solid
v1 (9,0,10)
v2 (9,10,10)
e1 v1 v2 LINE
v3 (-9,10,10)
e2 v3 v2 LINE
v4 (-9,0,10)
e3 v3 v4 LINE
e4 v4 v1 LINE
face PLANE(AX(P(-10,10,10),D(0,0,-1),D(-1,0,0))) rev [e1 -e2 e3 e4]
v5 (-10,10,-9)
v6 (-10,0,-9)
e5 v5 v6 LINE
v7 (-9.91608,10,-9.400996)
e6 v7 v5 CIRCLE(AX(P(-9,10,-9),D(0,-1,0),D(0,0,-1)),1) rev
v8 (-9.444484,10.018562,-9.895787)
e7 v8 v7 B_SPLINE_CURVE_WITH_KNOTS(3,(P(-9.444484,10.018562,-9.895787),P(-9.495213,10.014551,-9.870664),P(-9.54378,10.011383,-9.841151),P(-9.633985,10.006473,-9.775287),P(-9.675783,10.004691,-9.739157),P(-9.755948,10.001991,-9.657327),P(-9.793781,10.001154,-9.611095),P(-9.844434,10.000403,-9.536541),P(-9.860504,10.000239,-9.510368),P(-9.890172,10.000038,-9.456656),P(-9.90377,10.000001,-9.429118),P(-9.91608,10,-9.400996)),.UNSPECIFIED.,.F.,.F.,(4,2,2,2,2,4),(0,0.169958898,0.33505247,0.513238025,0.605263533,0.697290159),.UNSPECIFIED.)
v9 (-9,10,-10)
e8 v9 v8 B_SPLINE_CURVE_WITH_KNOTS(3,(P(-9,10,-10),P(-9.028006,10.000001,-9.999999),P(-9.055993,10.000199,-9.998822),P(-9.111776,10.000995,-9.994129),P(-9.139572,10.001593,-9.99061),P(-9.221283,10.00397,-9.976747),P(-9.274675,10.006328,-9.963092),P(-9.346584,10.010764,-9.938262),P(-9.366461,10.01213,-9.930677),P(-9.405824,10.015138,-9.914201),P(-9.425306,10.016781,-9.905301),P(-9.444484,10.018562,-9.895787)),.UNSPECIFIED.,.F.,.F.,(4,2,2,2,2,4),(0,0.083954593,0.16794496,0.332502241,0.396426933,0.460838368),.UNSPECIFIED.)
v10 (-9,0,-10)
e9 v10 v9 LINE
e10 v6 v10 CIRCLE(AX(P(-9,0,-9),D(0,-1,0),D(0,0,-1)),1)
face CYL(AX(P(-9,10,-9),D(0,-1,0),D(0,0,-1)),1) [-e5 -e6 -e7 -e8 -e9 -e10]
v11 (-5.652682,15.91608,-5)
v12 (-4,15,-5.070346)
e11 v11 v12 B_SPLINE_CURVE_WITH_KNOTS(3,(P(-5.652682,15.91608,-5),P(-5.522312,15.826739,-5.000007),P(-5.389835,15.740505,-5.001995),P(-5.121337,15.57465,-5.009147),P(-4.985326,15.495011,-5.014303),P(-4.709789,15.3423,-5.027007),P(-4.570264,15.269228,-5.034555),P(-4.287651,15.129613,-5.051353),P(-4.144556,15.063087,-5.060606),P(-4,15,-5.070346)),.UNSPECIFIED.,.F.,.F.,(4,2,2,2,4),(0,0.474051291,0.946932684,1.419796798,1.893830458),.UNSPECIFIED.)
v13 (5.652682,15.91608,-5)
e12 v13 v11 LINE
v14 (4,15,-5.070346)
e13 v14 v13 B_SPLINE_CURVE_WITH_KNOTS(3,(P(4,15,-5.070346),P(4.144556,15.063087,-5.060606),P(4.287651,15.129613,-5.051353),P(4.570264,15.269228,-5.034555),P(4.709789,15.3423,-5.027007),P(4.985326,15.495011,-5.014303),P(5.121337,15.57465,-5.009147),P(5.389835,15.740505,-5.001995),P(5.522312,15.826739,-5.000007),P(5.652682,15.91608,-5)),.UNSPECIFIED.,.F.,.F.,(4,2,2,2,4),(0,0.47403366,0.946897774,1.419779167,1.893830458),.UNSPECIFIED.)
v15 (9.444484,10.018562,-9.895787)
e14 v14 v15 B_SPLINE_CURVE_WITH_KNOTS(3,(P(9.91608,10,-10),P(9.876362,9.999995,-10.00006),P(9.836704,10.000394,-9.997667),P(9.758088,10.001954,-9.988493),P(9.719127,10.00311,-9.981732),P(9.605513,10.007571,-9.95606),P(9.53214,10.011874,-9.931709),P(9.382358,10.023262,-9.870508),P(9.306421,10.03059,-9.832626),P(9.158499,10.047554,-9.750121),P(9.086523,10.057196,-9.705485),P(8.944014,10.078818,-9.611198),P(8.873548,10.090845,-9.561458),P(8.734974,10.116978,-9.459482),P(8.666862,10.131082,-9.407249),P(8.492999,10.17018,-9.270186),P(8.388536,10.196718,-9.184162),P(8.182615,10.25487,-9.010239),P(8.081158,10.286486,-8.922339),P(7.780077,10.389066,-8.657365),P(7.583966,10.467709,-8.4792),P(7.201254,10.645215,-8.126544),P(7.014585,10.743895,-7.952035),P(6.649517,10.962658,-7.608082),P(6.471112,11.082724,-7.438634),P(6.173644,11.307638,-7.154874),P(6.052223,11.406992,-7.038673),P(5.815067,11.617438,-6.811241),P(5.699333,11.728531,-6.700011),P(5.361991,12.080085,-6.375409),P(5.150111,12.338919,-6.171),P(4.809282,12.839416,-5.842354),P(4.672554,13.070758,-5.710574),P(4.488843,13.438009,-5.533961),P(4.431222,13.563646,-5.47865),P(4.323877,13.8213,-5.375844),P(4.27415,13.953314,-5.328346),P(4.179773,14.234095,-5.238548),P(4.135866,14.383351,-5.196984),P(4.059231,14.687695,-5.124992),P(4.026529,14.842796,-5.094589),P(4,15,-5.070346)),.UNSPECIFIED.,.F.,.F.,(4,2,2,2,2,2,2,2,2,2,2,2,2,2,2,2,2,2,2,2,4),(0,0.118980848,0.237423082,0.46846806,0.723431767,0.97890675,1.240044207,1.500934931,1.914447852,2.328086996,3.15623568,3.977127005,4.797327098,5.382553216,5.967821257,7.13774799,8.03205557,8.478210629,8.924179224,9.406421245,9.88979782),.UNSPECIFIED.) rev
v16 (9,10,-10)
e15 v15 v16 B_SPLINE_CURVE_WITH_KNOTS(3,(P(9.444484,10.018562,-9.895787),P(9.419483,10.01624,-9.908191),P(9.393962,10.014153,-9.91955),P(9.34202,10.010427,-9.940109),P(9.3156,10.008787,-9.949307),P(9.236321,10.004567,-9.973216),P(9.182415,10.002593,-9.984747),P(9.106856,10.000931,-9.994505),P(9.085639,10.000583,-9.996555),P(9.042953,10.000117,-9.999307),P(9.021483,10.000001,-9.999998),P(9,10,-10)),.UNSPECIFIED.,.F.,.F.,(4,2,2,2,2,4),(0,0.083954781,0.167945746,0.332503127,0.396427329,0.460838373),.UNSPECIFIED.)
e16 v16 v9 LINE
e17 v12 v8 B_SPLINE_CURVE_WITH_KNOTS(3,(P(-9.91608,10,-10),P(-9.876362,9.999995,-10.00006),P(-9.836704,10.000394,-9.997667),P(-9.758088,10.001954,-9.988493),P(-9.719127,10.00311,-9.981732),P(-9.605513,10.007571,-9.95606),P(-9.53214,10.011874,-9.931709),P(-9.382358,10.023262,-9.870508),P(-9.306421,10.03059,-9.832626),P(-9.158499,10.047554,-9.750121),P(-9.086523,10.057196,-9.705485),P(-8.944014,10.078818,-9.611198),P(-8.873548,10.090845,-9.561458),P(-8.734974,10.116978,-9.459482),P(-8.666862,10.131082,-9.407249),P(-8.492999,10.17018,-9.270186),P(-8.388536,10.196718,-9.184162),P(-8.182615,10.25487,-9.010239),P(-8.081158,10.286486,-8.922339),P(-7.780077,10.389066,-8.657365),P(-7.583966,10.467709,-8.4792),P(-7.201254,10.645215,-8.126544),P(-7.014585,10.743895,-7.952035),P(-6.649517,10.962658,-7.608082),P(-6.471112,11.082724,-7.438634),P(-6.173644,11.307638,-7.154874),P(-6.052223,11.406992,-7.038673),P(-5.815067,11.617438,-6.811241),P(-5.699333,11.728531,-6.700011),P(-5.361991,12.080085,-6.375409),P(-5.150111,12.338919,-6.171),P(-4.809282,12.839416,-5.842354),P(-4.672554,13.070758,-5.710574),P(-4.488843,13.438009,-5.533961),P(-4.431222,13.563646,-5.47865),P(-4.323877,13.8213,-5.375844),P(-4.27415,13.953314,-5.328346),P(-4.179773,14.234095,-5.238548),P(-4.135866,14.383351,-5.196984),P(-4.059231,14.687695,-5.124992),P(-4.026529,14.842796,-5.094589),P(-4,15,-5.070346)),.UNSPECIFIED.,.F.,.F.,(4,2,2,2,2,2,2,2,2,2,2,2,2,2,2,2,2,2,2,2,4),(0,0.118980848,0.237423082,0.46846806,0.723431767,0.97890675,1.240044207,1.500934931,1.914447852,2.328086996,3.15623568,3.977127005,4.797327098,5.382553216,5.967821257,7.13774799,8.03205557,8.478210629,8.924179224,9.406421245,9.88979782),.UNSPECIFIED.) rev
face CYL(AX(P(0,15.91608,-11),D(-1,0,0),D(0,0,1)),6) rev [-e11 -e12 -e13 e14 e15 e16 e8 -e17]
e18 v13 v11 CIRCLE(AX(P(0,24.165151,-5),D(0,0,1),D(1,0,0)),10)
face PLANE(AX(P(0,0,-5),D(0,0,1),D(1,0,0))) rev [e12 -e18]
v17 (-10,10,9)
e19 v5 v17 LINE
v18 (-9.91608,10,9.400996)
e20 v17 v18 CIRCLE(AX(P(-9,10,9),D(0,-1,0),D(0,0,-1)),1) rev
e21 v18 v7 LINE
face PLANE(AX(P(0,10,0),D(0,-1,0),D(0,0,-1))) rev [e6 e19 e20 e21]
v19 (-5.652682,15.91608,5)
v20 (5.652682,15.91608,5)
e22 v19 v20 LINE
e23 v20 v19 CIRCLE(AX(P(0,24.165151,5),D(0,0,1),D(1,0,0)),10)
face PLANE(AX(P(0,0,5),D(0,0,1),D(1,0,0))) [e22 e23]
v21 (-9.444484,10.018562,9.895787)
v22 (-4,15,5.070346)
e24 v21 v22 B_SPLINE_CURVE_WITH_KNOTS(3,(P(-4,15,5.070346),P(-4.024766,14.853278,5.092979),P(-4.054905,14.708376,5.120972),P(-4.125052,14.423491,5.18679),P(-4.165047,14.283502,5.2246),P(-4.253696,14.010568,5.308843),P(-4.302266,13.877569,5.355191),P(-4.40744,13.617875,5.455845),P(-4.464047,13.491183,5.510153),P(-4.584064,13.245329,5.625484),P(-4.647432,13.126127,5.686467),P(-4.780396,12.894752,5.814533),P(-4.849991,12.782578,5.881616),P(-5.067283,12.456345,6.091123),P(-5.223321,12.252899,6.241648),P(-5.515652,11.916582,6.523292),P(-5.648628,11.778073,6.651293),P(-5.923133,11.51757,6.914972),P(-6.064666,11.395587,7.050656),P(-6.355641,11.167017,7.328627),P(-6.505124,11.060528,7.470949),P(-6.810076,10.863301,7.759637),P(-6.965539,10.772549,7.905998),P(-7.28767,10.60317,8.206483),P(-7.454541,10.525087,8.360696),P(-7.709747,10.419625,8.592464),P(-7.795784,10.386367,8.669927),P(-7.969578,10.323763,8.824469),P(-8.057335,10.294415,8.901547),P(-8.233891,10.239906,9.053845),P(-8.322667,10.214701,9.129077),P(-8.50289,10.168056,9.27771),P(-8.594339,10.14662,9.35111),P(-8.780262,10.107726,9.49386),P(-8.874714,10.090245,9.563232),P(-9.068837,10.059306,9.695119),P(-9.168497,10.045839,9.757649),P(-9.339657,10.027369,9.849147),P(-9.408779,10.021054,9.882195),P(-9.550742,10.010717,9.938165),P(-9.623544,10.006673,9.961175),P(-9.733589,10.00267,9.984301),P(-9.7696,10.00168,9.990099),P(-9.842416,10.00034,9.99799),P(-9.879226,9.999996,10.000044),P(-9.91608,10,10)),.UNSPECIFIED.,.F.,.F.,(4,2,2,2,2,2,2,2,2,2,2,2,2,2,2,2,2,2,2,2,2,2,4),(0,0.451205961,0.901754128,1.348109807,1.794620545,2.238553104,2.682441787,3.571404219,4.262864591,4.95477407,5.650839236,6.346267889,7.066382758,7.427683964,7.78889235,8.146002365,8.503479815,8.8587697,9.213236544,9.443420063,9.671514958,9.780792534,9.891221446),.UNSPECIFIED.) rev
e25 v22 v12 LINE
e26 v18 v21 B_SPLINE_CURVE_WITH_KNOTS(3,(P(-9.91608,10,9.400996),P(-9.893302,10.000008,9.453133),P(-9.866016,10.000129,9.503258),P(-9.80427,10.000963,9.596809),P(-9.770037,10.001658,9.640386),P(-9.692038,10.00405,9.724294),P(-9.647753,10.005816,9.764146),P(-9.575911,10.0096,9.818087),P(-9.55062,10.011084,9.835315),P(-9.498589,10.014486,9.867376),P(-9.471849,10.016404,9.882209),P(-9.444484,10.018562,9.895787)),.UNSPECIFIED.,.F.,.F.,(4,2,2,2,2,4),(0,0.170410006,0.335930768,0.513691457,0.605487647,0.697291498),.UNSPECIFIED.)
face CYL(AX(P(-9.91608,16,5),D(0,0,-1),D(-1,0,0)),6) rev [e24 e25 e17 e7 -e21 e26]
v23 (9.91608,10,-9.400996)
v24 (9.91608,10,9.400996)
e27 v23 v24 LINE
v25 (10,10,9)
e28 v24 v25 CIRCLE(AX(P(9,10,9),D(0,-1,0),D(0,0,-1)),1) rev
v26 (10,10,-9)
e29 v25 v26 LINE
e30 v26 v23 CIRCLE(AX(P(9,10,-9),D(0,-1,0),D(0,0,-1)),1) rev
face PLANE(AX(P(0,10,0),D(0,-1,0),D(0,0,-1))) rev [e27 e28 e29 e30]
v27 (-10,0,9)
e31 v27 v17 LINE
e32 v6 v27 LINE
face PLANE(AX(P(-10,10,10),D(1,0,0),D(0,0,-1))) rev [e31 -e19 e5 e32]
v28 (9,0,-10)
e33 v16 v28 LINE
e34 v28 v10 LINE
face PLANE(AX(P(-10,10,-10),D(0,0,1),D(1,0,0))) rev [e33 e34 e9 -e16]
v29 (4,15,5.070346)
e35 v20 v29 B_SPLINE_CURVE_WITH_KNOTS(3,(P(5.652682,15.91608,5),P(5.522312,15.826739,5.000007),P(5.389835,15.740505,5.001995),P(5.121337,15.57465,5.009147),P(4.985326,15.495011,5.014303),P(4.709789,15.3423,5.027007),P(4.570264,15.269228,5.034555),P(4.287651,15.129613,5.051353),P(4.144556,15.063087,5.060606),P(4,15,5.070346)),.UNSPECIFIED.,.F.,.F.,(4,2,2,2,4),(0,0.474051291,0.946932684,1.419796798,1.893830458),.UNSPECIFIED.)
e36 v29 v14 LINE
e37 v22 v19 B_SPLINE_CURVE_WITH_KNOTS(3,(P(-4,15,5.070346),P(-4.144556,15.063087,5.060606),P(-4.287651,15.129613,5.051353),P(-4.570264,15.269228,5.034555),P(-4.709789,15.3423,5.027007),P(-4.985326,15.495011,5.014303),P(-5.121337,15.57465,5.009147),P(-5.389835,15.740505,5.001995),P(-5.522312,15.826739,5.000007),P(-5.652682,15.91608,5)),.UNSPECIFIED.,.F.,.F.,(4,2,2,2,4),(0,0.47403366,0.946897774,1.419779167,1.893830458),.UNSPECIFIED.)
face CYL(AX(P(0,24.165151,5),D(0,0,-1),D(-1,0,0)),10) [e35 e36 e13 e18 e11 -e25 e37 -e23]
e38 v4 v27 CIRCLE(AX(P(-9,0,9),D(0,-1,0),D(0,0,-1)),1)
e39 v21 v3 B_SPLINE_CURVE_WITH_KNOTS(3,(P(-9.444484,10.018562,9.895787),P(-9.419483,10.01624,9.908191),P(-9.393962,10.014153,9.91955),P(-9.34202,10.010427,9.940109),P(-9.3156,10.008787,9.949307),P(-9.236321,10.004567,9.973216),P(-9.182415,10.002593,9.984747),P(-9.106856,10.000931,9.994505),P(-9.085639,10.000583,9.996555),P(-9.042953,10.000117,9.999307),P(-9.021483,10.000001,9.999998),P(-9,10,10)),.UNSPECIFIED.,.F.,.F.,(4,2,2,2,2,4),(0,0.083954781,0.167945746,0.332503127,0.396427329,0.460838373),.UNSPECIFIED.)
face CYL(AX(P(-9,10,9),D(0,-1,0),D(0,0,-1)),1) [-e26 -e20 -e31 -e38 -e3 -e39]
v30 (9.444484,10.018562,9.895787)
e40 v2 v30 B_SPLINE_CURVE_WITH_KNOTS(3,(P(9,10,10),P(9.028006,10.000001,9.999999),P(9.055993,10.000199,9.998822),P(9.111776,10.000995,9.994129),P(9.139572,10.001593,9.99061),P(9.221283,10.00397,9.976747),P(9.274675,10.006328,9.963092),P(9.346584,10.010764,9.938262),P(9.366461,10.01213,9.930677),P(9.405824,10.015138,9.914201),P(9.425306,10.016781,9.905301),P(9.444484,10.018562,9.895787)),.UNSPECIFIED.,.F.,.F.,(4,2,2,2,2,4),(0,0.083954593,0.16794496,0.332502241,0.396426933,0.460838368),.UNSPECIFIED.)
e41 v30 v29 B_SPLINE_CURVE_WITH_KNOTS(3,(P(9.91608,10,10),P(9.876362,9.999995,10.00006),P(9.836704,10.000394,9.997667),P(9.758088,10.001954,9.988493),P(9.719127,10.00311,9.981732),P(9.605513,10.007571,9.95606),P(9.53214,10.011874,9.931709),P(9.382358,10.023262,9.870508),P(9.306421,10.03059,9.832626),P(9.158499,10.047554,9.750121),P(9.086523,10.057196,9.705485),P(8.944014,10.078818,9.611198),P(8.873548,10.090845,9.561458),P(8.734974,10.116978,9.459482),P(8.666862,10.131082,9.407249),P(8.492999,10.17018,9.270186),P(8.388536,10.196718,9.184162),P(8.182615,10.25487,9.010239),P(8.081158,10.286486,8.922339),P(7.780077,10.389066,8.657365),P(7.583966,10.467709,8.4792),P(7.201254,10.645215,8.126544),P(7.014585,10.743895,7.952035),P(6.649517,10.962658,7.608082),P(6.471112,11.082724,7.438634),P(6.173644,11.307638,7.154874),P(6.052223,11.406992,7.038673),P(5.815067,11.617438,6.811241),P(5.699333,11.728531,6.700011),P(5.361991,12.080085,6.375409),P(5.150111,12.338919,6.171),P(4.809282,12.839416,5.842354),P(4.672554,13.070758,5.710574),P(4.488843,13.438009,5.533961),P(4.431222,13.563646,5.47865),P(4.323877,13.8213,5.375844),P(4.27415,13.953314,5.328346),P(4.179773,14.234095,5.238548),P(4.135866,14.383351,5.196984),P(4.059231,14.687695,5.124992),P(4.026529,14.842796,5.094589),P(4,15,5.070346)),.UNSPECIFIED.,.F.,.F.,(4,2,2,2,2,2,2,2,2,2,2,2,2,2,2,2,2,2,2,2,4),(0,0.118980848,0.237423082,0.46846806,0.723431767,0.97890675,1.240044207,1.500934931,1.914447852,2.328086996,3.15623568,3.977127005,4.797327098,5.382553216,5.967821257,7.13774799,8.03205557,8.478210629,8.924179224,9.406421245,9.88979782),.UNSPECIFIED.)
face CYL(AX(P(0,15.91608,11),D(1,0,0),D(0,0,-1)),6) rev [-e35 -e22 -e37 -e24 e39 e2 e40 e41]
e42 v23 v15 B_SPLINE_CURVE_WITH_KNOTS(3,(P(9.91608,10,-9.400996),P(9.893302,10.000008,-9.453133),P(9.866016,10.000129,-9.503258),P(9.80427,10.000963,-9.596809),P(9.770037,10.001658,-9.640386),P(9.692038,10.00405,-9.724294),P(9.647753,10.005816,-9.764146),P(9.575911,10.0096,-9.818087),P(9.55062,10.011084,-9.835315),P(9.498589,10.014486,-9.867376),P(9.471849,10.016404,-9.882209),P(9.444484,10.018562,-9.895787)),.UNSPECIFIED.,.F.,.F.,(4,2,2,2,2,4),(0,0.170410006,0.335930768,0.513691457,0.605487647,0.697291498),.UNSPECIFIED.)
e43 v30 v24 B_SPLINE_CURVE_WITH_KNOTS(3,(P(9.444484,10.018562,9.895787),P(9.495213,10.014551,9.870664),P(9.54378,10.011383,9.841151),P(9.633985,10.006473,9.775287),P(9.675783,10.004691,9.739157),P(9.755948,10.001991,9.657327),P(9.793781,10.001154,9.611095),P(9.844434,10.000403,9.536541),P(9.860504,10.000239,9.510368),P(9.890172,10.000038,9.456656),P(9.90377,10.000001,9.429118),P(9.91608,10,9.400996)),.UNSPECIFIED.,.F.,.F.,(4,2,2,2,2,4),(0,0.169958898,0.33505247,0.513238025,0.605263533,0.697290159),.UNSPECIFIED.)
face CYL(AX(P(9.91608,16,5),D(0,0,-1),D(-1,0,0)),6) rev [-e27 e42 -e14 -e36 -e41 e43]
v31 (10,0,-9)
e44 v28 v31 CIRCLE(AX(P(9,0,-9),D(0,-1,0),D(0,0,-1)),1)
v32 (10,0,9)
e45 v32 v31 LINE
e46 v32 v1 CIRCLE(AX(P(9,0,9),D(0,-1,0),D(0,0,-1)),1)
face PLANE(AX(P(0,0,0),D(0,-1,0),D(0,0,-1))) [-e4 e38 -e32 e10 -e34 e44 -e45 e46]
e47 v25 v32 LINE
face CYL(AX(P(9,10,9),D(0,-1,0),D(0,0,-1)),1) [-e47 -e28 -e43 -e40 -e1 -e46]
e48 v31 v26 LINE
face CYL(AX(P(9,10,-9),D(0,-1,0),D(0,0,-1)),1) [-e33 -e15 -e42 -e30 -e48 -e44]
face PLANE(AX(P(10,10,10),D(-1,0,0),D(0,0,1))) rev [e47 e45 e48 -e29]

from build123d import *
from OCP.BRepAlgoAPI import BRepAlgoAPI_Cut
from OCP.TopTools import TopTools_ListOfShape

# Parameters (mm, degrees)
SKIZZE1_W                       = 20
SKIZZE1_H                       = 20
AUFSATZ_LINEAR_AUSTRAGEN1_DEPTH = 10
AUFSATZ_LINEAR_AUSTRAGEN2_DEPTH = 5
VERRUNDUNG1_START               = -5
VERRUNDUNG1_DEPTH               = 10
VERRUNDUNG1_START_2             = -10.000001186
VERRUNDUNG1_2_DEPTH             = 20.000001186
VERRUNDUNG1_START_3             = -11
VERRUNDUNG1_3_DEPTH             = 22
VERRUNDUNG2_R                   = 1


with BuildPart() as part:
    # Skizze1 → Aufsatz-Linear austragen1 (new body)
    with BuildSketch(Plane(origin=(0, 0, 0), x_dir=(1, 0, 0), z_dir=(0, 1, 0))):
        Rectangle(SKIZZE1_W, SKIZZE1_H)
    extrude(amount=AUFSATZ_LINEAR_AUSTRAGEN1_DEPTH)

    # Skizze3 → Aufsatz-Linear austragen2 (add, symmetric)
    with BuildSketch(Plane.XY):
        with BuildLine():
            Line((-4, 15), (-4, 10))
            Line((-4, 10), (4, 10))
            Line((4, 10), (4, 15))
            ThreePointArc((4, 15), (0, 34.16515139), (-4, 15))
        make_face()
    extrude(amount=AUFSATZ_LINEAR_AUSTRAGEN2_DEPTH, both=True)


with BuildPart() as verrundung1_tool:
    # Verrundung1: read off the stored shape, not the designer's step
    # Verrundung1 outline → Verrundung1 (new body)
    with BuildSketch(Plane.XY.offset(VERRUNDUNG1_START)):
        with BuildLine():
            Line((4, 10), (9.916079783, 10))
            ThreePointArc((9.916079783, 10), (6.043096437, 11.417424305), (4, 15))
            Line((4, 15), (4, 10))
        make_face()
        with BuildLine():
            Line((-9.916079783, 10), (-4, 10))
            Line((-4, 10), (-4, 15))
            ThreePointArc((-4, 15), (-6.043096437, 11.417424305), (-9.916079783, 10))
        make_face()
    extrude(amount=VERRUNDUNG1_DEPTH)


with BuildPart() as part_1:
    add(part.part)


with BuildPart() as part_2:
    # Verrundung1: joined with verrundung1_tool
    add(part_1.part.fuse(verrundung1_tool.part, tol=0.00001))


with BuildPart() as verrundung1_2_tool:
    # Verrundung1 2 outline → Verrundung1 2 (new body)
    with BuildSketch(Plane.XY.offset(VERRUNDUNG1_START_2)):
        with BuildLine():
            Line((-9.916079783, 10), (9.916079783, 10))
            ThreePointArc((9.916079783, 10), (6.043096437, 11.417424305), (4, 15))
            ThreePointArc((4, 15), (0, 34.16515139), (-4, 15))
            ThreePointArc((-4, 15), (-6.043096437, 11.417424305), (-9.916079783, 10))
        make_face()
    extrude(amount=VERRUNDUNG1_2_DEPTH)


with BuildPart() as part_3:
    add(part_2.part)


with BuildPart() as part_4:
    # Verrundung1 2: joined with verrundung1_2_tool
    add(part_3.part.fuse(verrundung1_2_tool.part, tol=0.00001))


with BuildPart() as verrundung1_3_tool:
    # Verrundung1 3 outline → Verrundung1 3 (new body)
    with BuildSketch(Plane.YZ.offset(VERRUNDUNG1_START_3)):
        with BuildLine():
            Line((15.916079783, 5), (34.16515139, 5))
            Line((34.16515139, 5), (36, 5))
            Line((36, 5), (36, 10))
            Line((36, 10), (34.16515139, 10))
            Line((34.16515139, 10), (9.999989402, 10.000062699))
            ThreePointArc((9.999989402, 10.000062699), (12.043072154, 6.417444828), (15.916079783, 5))
        make_face()
        with BuildLine():
            Line((36, -10.000001186), (36, -5))
            Line((36, -5), (34.16515139, -5))
            Line((34.16515139, -5), (15.916079783, -5))
            ThreePointArc((15.916079783, -5), (12.043072154, -6.417444828), (9.999989402, -10.000062699))
            Line((9.999989402, -10.000062699), (34.16515139, -10.000001186))
            Line((34.16515139, -10.000001186), (36, -10.000001186))
        make_face()
    extrude(amount=VERRUNDUNG1_3_DEPTH)


with BuildPart() as part_5:
    add(part_4.part)

    # Verrundung1 3: cut by verrundung1_3_tool, with a tolerance
    verrundung1_3_stock = TopTools_ListOfShape()
    verrundung1_3_stock.Append(part_5.part.wrapped)
    verrundung1_3_tools = TopTools_ListOfShape()
    verrundung1_3_tools.Append(verrundung1_3_tool.part.wrapped)
    verrundung1_3_cut = BRepAlgoAPI_Cut()
    verrundung1_3_cut.SetArguments(verrundung1_3_stock)
    verrundung1_3_cut.SetTools(verrundung1_3_tools)
    verrundung1_3_cut.SetFuzzyValue(0.00001)
    verrundung1_3_cut.Build()
    add(Compound.cast(verrundung1_3_cut.Shape()).solids(), mode=Mode.REPLACE)

    # Verrundung2
    # the kernel refuses this fillet: 1 mm, written as the material it takes off along each edge
    with BuildSketch(Plane(origin=(-10, -2.5, 10), x_dir=(1, 0, 0), z_dir=(0, 1, 0)), Plane(origin=(-10, -2.5, -10), x_dir=(0, 0, 1), z_dir=(0, 1, 0))) as verrundung2_piece_1:
        with BuildLine():
            CenterArc((VERRUNDUNG2_R, VERRUNDUNG2_R), VERRUNDUNG2_R, 180, 90)
            Line((0, VERRUNDUNG2_R), (0, 0))
            Line((0, 0), (VERRUNDUNG2_R, 0))
        make_face()
    extrude(amount=15, mode=Mode.SUBTRACT)
    with BuildSketch(Plane(origin=(10, -2.5, -10), x_dir=(0, 0, 1), z_dir=(0, 1, 0)), Plane(origin=(10, -2.5, 10), x_dir=(-1, 0, 0), z_dir=(0, 1, 0))) as verrundung2_piece_2:
        with BuildLine():
            CenterArc((VERRUNDUNG2_R, -VERRUNDUNG2_R), VERRUNDUNG2_R, 90, 90)
            Line((0, -VERRUNDUNG2_R), (0, 0))
            Line((0, 0), (VERRUNDUNG2_R, 0))
        make_face()
    extrude(amount=15, mode=Mode.SUBTRACT)


solid = part_5.part
